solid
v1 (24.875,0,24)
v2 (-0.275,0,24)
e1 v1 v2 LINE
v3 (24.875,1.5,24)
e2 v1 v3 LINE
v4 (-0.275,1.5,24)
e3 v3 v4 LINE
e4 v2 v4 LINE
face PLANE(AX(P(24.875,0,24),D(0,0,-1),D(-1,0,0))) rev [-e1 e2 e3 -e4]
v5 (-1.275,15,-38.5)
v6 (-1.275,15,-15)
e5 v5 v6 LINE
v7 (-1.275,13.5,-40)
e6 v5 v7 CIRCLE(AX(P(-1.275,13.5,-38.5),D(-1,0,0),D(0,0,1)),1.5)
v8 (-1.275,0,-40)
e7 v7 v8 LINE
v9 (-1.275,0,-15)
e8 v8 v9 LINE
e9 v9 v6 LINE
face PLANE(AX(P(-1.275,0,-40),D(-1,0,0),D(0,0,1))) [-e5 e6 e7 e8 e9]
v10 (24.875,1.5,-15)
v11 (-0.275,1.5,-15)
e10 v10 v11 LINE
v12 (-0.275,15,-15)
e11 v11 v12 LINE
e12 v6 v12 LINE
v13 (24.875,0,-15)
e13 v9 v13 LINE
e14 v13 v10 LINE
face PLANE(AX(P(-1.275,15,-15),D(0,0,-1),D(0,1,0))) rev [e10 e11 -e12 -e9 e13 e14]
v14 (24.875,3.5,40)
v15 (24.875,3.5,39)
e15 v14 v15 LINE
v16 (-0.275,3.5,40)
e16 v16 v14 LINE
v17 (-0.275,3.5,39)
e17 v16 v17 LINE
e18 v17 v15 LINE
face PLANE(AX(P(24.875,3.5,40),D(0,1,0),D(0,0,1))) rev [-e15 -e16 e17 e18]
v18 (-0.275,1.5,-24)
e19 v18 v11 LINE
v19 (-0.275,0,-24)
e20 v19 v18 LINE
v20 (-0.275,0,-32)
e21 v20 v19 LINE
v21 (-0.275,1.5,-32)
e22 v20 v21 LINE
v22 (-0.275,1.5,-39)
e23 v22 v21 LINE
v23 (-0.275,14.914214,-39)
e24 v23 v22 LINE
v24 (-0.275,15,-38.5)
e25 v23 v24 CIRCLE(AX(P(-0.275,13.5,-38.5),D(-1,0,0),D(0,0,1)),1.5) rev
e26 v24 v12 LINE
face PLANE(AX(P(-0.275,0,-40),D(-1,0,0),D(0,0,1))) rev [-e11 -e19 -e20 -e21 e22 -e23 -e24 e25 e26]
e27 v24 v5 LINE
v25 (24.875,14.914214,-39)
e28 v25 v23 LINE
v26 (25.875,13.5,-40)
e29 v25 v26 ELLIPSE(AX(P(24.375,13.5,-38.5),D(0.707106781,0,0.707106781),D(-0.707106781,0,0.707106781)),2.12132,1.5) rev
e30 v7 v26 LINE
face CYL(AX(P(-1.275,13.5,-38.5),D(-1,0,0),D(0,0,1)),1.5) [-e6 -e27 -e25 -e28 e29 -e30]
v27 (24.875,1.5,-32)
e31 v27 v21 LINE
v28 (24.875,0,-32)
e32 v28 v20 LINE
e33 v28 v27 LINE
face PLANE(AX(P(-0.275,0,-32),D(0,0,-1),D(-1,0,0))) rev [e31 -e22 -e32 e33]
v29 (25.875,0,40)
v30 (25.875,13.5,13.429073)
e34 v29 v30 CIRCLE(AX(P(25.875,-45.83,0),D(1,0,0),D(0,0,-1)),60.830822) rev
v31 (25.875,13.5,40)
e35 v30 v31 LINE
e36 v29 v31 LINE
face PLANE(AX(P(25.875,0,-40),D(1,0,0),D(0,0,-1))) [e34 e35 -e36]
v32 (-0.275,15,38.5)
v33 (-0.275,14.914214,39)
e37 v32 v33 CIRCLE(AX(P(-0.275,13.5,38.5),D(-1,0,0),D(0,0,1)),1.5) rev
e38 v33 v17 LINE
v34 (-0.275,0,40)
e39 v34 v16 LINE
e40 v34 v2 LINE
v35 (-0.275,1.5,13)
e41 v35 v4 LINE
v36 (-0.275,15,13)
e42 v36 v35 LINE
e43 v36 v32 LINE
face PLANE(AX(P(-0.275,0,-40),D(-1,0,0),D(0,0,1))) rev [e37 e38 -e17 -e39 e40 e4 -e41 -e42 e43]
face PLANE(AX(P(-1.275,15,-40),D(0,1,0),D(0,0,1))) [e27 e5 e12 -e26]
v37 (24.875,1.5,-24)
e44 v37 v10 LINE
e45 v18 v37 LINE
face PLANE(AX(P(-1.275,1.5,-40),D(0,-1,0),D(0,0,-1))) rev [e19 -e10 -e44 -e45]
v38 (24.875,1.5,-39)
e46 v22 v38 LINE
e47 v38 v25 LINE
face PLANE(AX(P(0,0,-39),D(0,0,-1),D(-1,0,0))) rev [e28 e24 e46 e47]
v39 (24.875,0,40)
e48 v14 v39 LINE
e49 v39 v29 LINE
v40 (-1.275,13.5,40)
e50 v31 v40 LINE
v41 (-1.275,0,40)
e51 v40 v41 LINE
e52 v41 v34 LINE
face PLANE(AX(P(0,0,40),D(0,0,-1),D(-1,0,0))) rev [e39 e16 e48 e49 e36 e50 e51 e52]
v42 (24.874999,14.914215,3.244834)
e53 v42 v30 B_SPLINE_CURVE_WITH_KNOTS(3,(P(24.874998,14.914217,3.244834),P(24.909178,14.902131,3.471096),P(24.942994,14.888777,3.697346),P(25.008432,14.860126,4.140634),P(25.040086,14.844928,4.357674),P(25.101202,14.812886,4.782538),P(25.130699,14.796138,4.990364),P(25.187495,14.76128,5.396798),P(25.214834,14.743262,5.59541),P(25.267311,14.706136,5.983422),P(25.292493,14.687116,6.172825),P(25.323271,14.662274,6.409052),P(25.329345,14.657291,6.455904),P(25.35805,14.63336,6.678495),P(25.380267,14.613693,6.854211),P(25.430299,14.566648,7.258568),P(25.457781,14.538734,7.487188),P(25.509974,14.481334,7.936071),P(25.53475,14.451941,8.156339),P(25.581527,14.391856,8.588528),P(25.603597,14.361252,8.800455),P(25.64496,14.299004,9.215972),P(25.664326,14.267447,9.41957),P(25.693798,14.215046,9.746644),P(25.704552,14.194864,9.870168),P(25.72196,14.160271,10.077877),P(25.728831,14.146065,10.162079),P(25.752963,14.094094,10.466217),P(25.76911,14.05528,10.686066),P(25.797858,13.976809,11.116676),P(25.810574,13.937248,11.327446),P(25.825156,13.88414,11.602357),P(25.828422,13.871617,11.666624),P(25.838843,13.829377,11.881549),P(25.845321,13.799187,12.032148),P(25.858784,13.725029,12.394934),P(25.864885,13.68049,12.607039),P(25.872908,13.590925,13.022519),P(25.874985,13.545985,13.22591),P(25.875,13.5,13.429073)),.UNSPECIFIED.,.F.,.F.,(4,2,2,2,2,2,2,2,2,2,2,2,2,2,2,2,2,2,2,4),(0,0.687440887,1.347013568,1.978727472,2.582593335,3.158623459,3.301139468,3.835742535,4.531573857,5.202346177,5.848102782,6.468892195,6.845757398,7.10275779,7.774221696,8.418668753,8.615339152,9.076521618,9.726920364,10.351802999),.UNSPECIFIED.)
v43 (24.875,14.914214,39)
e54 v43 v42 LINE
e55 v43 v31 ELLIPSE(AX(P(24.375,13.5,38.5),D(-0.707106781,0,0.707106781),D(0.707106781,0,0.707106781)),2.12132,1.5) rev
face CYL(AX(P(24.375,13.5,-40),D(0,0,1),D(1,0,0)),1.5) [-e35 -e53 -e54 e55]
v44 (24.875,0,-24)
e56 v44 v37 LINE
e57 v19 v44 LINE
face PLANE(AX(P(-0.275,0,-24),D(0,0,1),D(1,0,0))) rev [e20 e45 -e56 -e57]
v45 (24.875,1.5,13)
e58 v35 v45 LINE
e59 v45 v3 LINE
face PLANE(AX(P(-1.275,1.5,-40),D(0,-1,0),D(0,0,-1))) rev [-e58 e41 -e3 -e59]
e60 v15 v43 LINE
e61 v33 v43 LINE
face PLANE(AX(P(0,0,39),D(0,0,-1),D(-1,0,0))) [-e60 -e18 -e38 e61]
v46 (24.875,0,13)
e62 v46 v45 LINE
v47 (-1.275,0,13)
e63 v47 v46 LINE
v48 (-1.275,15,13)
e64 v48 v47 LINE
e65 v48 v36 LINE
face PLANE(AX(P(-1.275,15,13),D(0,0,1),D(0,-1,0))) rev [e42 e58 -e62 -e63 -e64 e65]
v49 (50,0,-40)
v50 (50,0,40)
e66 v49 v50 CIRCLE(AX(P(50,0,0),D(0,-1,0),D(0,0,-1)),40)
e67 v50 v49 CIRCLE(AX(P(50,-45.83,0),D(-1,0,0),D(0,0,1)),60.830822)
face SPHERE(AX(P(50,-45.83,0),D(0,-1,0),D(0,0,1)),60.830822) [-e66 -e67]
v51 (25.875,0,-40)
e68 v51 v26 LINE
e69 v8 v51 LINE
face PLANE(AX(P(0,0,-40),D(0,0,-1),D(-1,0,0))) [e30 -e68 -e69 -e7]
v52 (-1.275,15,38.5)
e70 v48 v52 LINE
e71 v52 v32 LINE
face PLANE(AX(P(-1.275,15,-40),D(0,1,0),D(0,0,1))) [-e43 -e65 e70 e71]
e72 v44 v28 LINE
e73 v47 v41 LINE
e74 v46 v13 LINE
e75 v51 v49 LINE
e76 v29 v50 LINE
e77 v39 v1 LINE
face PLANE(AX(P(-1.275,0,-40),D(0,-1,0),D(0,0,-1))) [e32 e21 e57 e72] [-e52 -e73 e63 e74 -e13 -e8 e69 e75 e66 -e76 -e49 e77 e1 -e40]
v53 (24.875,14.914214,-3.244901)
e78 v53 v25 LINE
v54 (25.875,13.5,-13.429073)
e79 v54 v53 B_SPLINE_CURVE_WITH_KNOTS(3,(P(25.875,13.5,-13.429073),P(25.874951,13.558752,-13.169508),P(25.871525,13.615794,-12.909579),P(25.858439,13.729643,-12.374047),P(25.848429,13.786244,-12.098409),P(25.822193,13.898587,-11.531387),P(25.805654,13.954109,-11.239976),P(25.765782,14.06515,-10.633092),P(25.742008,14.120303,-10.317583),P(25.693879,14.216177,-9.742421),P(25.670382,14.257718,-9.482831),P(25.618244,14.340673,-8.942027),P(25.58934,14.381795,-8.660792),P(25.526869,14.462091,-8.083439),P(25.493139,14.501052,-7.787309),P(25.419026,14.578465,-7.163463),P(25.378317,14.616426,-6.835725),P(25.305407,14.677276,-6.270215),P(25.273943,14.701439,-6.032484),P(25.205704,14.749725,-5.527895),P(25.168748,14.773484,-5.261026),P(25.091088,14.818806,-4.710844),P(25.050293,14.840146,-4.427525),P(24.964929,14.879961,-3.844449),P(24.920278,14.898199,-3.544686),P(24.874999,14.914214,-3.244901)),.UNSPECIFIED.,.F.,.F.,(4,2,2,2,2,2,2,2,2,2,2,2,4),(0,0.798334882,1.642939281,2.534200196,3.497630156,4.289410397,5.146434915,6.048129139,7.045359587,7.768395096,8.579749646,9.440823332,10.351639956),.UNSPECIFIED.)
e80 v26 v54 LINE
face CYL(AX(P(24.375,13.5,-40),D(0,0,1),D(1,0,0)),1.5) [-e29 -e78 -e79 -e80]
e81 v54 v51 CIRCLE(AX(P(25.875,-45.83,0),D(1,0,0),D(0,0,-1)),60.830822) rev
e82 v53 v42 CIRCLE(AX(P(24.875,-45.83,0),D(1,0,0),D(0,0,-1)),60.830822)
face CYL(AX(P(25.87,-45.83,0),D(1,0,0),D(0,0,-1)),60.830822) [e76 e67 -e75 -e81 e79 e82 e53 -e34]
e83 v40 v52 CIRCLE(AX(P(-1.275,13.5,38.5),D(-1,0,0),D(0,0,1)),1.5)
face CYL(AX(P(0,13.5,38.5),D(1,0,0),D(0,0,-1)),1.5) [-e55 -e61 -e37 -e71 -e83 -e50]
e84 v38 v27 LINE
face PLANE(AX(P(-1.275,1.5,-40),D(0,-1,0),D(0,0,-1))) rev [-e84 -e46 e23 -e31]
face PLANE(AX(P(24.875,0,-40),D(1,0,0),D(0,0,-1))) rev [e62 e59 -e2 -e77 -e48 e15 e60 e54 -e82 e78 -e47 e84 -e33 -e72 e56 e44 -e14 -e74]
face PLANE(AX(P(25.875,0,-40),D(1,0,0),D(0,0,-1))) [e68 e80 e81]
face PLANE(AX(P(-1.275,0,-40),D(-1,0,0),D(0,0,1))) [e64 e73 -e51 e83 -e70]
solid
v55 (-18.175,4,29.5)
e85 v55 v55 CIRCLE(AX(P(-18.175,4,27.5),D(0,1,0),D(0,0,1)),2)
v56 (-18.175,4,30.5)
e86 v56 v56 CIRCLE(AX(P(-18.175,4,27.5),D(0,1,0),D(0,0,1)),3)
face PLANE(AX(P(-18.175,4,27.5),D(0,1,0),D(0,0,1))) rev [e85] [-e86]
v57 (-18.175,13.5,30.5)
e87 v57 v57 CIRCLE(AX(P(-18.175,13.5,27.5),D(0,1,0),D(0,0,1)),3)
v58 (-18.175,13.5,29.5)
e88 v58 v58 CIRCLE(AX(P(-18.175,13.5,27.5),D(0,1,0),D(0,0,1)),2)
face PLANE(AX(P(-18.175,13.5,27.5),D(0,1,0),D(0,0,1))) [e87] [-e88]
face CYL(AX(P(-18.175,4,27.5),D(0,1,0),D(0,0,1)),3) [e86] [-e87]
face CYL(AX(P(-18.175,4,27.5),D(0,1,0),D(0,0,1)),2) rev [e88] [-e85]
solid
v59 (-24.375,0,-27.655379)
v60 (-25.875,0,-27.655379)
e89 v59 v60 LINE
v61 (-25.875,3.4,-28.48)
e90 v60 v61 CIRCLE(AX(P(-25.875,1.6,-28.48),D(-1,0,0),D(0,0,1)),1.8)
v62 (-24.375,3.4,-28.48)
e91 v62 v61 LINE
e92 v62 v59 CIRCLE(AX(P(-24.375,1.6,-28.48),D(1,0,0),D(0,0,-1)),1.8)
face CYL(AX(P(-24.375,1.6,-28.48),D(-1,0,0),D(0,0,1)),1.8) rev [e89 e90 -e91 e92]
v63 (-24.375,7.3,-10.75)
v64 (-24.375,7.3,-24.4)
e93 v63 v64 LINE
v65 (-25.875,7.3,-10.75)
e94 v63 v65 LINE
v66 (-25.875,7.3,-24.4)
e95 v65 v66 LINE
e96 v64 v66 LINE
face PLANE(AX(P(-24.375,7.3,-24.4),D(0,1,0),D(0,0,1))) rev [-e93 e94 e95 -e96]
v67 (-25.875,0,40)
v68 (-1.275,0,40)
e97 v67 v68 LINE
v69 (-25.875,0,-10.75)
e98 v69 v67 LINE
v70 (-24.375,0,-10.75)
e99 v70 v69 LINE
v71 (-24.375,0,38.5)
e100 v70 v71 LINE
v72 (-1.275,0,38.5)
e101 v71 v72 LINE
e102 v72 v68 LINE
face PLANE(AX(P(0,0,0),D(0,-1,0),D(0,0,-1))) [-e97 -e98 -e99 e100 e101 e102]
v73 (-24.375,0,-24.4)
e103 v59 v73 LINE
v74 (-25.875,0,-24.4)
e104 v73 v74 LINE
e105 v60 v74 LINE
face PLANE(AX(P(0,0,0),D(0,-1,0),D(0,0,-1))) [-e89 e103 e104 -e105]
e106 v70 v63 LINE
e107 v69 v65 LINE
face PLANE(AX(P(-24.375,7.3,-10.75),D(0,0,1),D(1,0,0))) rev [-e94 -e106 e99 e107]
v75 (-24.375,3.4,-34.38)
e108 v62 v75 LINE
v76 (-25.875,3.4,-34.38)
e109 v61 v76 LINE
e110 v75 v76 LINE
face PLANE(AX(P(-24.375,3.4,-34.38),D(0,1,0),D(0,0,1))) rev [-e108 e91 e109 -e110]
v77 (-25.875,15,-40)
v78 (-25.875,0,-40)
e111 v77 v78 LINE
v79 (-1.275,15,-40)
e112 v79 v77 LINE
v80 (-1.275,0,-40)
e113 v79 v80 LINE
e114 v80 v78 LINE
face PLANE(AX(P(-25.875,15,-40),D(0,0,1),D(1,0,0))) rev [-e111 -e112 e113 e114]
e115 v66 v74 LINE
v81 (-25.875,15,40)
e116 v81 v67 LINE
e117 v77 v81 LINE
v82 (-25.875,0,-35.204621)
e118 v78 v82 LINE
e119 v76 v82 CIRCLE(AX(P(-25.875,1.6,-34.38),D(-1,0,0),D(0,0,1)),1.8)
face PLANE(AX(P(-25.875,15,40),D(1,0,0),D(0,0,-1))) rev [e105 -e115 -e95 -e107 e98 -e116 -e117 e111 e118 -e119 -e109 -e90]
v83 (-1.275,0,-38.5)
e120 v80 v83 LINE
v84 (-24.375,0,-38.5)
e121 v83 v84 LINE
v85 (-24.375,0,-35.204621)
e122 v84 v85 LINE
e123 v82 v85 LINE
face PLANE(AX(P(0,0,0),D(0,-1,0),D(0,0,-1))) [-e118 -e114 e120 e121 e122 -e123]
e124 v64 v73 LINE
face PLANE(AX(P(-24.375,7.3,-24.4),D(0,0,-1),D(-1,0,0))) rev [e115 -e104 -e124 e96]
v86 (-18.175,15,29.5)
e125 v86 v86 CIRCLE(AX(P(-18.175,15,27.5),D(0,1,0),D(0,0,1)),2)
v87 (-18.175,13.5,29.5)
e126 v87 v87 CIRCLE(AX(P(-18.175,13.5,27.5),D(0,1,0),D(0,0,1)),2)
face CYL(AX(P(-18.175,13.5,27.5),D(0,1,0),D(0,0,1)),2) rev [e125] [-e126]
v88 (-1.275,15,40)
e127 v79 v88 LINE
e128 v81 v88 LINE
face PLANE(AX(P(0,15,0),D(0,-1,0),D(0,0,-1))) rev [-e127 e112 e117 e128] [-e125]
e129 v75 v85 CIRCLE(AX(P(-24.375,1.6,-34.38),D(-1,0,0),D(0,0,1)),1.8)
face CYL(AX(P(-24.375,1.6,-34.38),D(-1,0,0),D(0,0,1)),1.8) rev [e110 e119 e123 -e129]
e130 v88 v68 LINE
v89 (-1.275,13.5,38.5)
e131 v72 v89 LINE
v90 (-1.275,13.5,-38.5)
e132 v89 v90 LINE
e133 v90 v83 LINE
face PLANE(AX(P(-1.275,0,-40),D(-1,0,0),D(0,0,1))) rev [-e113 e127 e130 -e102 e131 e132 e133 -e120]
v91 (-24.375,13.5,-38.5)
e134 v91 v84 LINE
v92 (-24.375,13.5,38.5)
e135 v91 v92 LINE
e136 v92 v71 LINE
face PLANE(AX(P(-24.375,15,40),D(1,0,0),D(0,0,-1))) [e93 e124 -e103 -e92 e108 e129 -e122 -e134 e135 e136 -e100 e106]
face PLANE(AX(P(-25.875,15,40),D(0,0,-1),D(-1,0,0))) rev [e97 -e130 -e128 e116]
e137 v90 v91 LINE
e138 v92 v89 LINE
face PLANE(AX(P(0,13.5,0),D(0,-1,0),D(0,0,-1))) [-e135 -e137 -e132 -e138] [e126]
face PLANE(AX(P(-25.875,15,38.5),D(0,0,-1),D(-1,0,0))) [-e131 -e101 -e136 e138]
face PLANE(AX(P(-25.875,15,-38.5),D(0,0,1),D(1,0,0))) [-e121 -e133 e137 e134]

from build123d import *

# Parameters (mm, degrees)
SKETCH1_W                  = 51.75
SKETCH1_H                  = 80
BOSS_EXTRUDE1_DEPTH        = 15
SHELL3_T                   = -1.5
CUT_EXTRUDE2_DEPTH         = 1.5
SKETCH6_W                  = 13.65
SKETCH6_H                  = 7.3
CUT_EXTRUDE3_DEPTH         = 1.5
SKETCH11_R                 = 2
BOSS_EXTRUDE10_DEPTH       = 11
SKETCH11_3_R               = 2
CUT_EXTRUDE10_DEPTH        = 1.5
SHELL9_T                   = 1
SKETCH47_W                 = 27.15
SKETCH47_H                 = 15
CUT_EXTRUDE15_DEPTH        = 86.407936546
SKETCH47_2_W               = 27.15
SKETCH47_2_H               = 15
BOSS_EXTRUDE12_DEPTH       = 80
SHELL15_T                  = -1
SHELL15_THICKNESS_2_FACE_W = 78
SHELL15_THICKNESS_2_FACE_H = 25.15
SHELL15_THICKNESS_2_DEPTH  = 0.5
SKETCH52_W                 = 25.15
SKETCH52_H                 = 3.5
CUT_EXTRUDE21_DEPTH        = 1
SKETCH54_W                 = 28
SKETCH54_H                 = 15
CUT_EXTRUDE22_DEPTH        = 1
SKETCH55_W                 = 25.15
SKETCH55_H                 = 15
SKETCH55_W_2               = 26.15
SKETCH55_H_2               = 28
SKETCH55_H_3               = 8
CUT_EXTRUDE23_DEPTH        = 1.5
BOSS_EXTRUDE13_DEPTH       = 24.13
REVOLVE5_ANGLE             = 180
FILLET1_R                  = 1.5


with BuildPart() as part:
    # Sketch1 → Boss-Extrude1 (new body)
    with BuildSketch(Plane(origin=(0, 0, 0), x_dir=(1, 0, 0), z_dir=(0, 1, 0))):
        Rectangle(SKETCH1_W, SKETCH1_H)
    extrude(amount=BOSS_EXTRUDE1_DEPTH)

    # Shell3
    shell3_openings = [part.faces().sort_by_distance(p)[0] for p in [
        (0, 0, 0),
    ]]
    offset(amount=SHELL3_T, openings=shell3_openings, kind=Kind.INTERSECTION)

    # Sketch4 → Cut-Extrude2 (cut)
    with BuildSketch(Plane.ZY.offset(25.875)):
        with BuildLine():
            Line((-34.38, 3.4), (-28.48, 3.4))
            ThreePointArc((-28.48, 3.4), (-26.68, 1.6), (-28.48, -0.2))
            Line((-28.48, -0.2), (-34.38, -0.2))
            ThreePointArc((-34.38, -0.2), (-36.18, 1.6), (-34.38, 3.4))
        make_face()
    extrude(amount=-CUT_EXTRUDE2_DEPTH, mode=Mode.SUBTRACT)

    # Sketch6 → Cut-Extrude3 (cut)
    with BuildSketch(Plane.ZY.offset(25.875)):
        with Locations((-17.575, 3.65)):
            Rectangle(SKETCH6_W, SKETCH6_H)
    extrude(amount=-CUT_EXTRUDE3_DEPTH, mode=Mode.SUBTRACT)

    # Sketch11 → Boss-Extrude10 (add)
    with BuildSketch(Plane(origin=(0, 15, 0), x_dir=(1, 0, 0), z_dir=(0, 1, 0))):
        with Locations(Location((-18.175, -27.5, 0), (0, 0, 270))):
            Circle(SKETCH11_R)
    extrude(amount=-BOSS_EXTRUDE10_DEPTH)

    # Sketch11<3> → Cut-Extrude10 (cut)
    with BuildSketch(Plane(origin=(0, 15, 0), x_dir=(1, 0, 0), z_dir=(0, 1, 0))):
        with Locations(Location((-18.175, -27.5, 0), (0, 0, 270))):
            Circle(SKETCH11_3_R)
    extrude(amount=-CUT_EXTRUDE10_DEPTH, mode=Mode.SUBTRACT)


with BuildPart() as cut_extrude10_piece_1:
    # of the separate pieces the step leaves, piece 1, a body of its own (cut_extrude10_pieces)
    add(part.part.solids().sort_by_distance((-25.875, 0, 40))[0])

    # Sketch47 → Cut-Extrude15 (cut, through all)
    with BuildSketch(Plane.XY.offset(40)):
        with Locations((12.3, 7.5)):
            Rectangle(SKETCH47_W, SKETCH47_H)
    extrude(amount=-CUT_EXTRUDE15_DEPTH, mode=Mode.SUBTRACT)


with BuildPart() as cut_extrude10_piece_2:
    # of the separate pieces the step leaves, piece 2, a body of its own (cut_extrude10_pieces)
    add(part.part.solids().sort_by_distance((-18.175, 4, 29.5))[0])

    # Shell9
    shell9_openings = [cut_extrude10_piece_2.faces().sort_by_distance(p)[0] for p in [
        (-18.175, 4, 27.5),
        (-18.175, 13.5, 27.5),
    ]]
    offset(amount=SHELL9_T, openings=shell9_openings, kind=Kind.INTERSECTION)


with BuildPart() as body_3:
    # Sketch47<2> → Boss-Extrude12 (new body)
    with BuildSketch(Plane.XY.offset(40)):
        with Locations((12.3, 7.5)):
            Rectangle(SKETCH47_2_W, SKETCH47_2_H)
    extrude(amount=-BOSS_EXTRUDE12_DEPTH)

    # Shell15
    shell15_openings = [body_3.faces().sort_by_distance(p)[0] for p in [
        (12.3, 15, 0),
    ]]
    offset(amount=SHELL15_T, openings=shell15_openings, kind=Kind.INTERSECTION)

    # Shell15 thickness 2 face (on inner face of the shell) → Shell15 thickness 2 (add)
    with BuildSketch(Plane(origin=(12.3, 1, 0), x_dir=(0, 0, -1), z_dir=(0, -1, 0))):
        Rectangle(SHELL15_THICKNESS_2_FACE_W, SHELL15_THICKNESS_2_FACE_H)
    extrude(amount=-SHELL15_THICKNESS_2_DEPTH)

    # Sketch52 → Cut-Extrude21 (cut)
    with BuildSketch(Plane(origin=(0, 0, 39), x_dir=(-1, 0, 0), z_dir=(0, 0, -1))):
        with Locations((-12.3, 1.75)):
            Rectangle(SKETCH52_W, SKETCH52_H)
    extrude(amount=-CUT_EXTRUDE21_DEPTH, mode=Mode.SUBTRACT)

    # Sketch54 → Cut-Extrude22 (cut)
    with BuildSketch(Plane(origin=(-0.275, 0, 0), x_dir=(0, 0, -1), z_dir=(1, 0, 0))):
        with Locations((1, 7.5)):
            Rectangle(SKETCH54_W, SKETCH54_H)
    extrude(amount=-CUT_EXTRUDE22_DEPTH, mode=Mode.SUBTRACT)

    # Sketch55 → Cut-Extrude23 (cut)
    with BuildSketch(Plane(origin=(0, 1.5, 0), x_dir=(1, 0, 0), z_dir=(0, 1, 0))):
        with Locations((12.3, -31.5)):
            Rectangle(SKETCH55_W, SKETCH55_H)
        with Locations((11.8, 1)):
            Rectangle(SKETCH55_W_2, SKETCH55_H_2)
        with Locations((12.3, 28)):
            Rectangle(SKETCH55_W, SKETCH55_H_3)
    extrude(amount=-CUT_EXTRUDE23_DEPTH, mode=Mode.SUBTRACT)

    # Sketch63 → Boss-Extrude13 (add)
    with BuildSketch(Plane(origin=(50, 0, 0), x_dir=(0, 0, -1), z_dir=(1, 0, 0))):
        with BuildLine():
            Line((-40, 0), (40, 0))
            ThreePointArc((40, 0), (0, 15.000821957), (-40, 0))
        make_face()
    extrude(amount=-BOSS_EXTRUDE13_DEPTH)

    # Sketch69 → Revolve5 (revolve)
    with BuildSketch(Plane(origin=(50, 0, 0), x_dir=(0, 0, -1), z_dir=(1, 0, 0))):
        with BuildLine():
            Line((0, 15.000821957), (0, 0))
            Line((0, 0), (-40, 0))
            ThreePointArc((-40, 0), (-21.360153671, 11.127288692), (0, 15.000821957))
        make_face()
    revolve(axis=Axis((50, 15.000821957, 0), (0, 1, 0)), revolution_arc=REVOLVE5_ANGLE)

    # Fillet1
    # the kernel refuses this fillet: 1.5 mm, written as the material it takes off along each edge
    with BuildSketch(Plane(origin=(25.875, 15, 43.75), x_dir=(0, -1, 0), z_dir=(0, 0, -1))) as fillet1_piece_1_section:
        with BuildLine():
            CenterArc((FILLET1_R, FILLET1_R), FILLET1_R, 180, 90)
            Line((0, FILLET1_R), (0, 0))
            Line((0, 0), (FILLET1_R, 0))
        make_face()
    fillet1_piece_1 = extrude(amount=47.183772234, mode=Mode.PRIVATE)
    fillet1_piece_1 = fillet1_piece_1 - Plane(origin=(25.872528752, -45.83, 0), x_dir=(0, 0.753400965585748, -0.6575613926124789), z_dir=(1, 0, 0)) * Cylinder(60.830821957, 101, mode=Mode.PRIVATE)
    add(fillet1_piece_1, mode=Mode.SUBTRACT)
    with BuildSketch(Plane(origin=(29.625, 15, -40), x_dir=(0, -1, 0), z_dir=(-1, 0, 0))) as fillet1_piece_2:
        with BuildLine():
            CenterArc((FILLET1_R, FILLET1_R), FILLET1_R, 180, 90)
            Line((0, FILLET1_R), (0, 0))
            Line((0, 0), (FILLET1_R, 0))
        make_face()
    extrude(amount=34.65, mode=Mode.SUBTRACT)
    with BuildSketch(Plane(origin=(29.625, 15, 40), x_dir=(0, -1, 0), z_dir=(-1, 0, 0))) as fillet1_piece_3:
        with BuildLine():
            CenterArc((FILLET1_R, -FILLET1_R), FILLET1_R, 90, 90)
            Line((0, -FILLET1_R), (0, 0))
            Line((0, 0), (FILLET1_R, 0))
        make_face()
    extrude(amount=34.65, mode=Mode.SUBTRACT)
    with BuildSketch(Plane(origin=(25.875, 15, 3.433772234), x_dir=(-1, 0, 0), z_dir=(0, 0, -1))) as fillet1_piece_4_section:
        with BuildLine():
            CenterArc((FILLET1_R, -FILLET1_R), FILLET1_R, 90, 90)
            Line((0, -FILLET1_R), (0, 0))
            Line((0, 0), (FILLET1_R, 0))
        make_face()
    fillet1_piece_4 = extrude(amount=47.183772234, mode=Mode.PRIVATE)
    fillet1_piece_4 = fillet1_piece_4 - Plane(origin=(25.372542367, -45.83, 0), x_dir=(0, 0.753400965585748, -0.6575613926124789), z_dir=(1, 0, 0)) * Cylinder(60.830821957, 101, mode=Mode.PRIVATE)
    add(fillet1_piece_4, mode=Mode.SUBTRACT)


solid = Compound([cut_extrude10_piece_1.part, cut_extrude10_piece_2.part, body_3.part])
